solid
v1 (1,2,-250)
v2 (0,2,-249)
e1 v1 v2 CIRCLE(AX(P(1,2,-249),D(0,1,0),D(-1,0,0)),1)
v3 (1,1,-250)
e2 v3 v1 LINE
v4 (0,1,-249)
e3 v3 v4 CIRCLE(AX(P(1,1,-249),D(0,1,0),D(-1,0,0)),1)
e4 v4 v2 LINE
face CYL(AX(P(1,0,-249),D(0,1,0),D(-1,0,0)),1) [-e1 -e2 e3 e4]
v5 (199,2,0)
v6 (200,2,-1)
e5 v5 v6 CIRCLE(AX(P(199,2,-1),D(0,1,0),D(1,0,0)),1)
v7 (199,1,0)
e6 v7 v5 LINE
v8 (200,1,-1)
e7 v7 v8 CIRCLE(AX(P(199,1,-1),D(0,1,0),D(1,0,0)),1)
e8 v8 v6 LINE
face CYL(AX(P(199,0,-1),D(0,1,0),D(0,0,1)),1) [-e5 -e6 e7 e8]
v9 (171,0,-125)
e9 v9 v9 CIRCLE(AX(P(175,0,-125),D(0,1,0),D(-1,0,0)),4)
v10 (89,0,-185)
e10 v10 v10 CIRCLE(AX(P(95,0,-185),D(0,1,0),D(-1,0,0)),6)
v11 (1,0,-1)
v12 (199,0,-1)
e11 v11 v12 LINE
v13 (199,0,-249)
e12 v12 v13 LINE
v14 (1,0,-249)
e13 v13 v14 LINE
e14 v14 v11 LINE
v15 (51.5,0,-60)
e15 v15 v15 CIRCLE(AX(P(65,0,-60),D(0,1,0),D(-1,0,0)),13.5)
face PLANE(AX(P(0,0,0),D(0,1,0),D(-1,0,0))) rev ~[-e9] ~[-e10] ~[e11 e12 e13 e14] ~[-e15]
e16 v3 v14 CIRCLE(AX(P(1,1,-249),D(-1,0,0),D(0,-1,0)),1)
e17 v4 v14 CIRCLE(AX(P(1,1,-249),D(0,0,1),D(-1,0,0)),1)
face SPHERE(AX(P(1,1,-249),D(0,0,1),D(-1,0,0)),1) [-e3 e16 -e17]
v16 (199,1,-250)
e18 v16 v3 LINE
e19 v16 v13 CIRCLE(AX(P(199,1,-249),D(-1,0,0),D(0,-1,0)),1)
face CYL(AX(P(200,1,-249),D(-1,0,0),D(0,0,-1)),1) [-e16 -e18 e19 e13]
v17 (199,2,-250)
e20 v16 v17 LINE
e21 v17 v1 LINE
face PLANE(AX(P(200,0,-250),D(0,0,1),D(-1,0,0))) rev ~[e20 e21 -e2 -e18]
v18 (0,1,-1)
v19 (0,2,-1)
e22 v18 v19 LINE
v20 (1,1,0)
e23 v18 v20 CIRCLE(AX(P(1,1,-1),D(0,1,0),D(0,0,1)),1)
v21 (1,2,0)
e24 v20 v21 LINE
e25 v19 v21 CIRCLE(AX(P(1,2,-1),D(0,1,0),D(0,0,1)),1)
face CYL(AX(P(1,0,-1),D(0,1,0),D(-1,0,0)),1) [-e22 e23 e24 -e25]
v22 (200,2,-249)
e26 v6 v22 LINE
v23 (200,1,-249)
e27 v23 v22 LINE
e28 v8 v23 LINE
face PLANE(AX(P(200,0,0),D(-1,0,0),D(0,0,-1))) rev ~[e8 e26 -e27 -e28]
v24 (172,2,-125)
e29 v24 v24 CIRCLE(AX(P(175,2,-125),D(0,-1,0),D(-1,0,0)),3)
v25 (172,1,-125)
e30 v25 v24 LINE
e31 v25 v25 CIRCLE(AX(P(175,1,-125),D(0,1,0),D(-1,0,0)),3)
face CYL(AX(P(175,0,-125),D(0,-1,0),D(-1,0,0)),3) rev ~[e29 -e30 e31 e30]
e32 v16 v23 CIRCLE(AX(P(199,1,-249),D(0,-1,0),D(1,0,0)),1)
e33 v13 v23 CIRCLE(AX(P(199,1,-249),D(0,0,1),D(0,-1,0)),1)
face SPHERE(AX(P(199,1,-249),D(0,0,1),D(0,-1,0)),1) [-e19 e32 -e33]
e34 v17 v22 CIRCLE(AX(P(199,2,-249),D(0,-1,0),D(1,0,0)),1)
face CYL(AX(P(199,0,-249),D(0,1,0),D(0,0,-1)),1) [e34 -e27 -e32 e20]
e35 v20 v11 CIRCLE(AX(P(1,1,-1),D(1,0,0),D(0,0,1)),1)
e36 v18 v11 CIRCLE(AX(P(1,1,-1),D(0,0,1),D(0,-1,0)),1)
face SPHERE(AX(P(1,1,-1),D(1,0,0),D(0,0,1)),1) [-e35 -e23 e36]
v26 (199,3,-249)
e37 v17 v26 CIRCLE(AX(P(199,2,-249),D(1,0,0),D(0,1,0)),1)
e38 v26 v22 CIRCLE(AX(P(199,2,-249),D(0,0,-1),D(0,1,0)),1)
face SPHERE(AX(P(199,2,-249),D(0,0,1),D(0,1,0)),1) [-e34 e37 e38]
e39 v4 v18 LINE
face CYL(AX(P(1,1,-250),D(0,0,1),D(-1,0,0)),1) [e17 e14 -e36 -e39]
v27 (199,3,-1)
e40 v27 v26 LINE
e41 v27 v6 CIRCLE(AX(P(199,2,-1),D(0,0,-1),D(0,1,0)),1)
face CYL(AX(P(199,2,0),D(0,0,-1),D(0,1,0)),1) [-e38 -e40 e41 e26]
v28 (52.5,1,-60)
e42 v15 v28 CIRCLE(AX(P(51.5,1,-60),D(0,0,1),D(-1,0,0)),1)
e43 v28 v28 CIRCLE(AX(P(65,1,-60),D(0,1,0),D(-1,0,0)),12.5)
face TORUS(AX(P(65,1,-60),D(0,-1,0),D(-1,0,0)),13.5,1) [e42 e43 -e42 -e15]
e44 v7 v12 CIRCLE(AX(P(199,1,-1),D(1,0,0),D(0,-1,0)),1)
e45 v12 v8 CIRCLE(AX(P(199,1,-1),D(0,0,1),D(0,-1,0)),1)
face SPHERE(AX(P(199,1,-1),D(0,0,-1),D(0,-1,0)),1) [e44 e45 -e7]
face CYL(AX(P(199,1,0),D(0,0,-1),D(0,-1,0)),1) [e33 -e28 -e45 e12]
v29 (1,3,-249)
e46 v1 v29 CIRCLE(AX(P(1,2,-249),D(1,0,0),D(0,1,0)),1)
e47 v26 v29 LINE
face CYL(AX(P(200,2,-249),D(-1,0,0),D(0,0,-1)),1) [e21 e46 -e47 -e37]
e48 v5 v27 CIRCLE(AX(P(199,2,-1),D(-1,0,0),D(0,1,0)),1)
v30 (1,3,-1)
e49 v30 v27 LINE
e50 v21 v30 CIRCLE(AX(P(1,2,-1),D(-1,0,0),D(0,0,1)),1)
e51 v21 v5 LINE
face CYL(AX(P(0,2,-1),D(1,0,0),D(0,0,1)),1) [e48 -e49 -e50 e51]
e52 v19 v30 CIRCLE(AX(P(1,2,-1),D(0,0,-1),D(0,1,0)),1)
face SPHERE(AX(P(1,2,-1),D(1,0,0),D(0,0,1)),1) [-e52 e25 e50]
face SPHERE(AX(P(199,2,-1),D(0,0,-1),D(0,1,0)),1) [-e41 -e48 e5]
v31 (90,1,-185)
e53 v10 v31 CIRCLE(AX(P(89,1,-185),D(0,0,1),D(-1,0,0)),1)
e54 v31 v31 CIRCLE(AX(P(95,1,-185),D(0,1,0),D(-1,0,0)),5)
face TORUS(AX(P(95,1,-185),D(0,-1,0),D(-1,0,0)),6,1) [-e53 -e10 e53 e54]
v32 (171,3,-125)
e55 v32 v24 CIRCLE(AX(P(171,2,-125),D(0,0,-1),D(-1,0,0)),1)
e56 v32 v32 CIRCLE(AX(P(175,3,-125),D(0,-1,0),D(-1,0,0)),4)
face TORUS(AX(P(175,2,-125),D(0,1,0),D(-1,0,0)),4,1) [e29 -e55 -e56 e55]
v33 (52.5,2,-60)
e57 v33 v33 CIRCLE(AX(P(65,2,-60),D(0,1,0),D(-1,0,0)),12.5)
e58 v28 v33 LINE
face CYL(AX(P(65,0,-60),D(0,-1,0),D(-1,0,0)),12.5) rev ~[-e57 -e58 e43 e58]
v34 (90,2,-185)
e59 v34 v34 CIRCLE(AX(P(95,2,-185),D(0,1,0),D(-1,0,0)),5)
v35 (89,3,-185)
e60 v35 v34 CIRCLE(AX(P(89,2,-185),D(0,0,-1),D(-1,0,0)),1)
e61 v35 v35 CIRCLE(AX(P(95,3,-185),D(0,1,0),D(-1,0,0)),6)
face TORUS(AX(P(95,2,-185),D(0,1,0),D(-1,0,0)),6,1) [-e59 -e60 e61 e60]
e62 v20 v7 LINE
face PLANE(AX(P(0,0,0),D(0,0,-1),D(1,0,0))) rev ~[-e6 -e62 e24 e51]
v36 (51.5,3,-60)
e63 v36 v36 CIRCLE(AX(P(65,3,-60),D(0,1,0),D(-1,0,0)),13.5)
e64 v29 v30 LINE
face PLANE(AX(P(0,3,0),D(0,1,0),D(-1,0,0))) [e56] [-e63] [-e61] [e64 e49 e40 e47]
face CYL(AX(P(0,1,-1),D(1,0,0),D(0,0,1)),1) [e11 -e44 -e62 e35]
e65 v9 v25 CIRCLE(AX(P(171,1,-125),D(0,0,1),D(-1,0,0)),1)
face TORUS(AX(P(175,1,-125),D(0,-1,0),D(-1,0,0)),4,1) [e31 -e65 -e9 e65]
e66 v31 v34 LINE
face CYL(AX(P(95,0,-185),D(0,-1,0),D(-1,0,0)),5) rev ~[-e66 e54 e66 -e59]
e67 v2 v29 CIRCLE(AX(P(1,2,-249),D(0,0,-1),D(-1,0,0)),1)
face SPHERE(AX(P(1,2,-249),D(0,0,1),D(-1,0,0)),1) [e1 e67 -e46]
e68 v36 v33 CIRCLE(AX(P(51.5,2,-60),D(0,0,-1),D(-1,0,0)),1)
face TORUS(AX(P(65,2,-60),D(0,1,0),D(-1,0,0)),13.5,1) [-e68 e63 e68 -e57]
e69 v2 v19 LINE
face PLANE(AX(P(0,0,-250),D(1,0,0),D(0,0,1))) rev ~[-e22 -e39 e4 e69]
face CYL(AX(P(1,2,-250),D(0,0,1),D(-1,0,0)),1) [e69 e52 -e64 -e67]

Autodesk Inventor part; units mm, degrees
ref_plane "YZ Plane" through (0, 0, 0) normal (1, 0, 0) x (0, 1, 0)
ref_plane "XZ Plane" through (0, 0, 0) normal (0, 1, 0) x (-1, 0, 0)
ref_plane "XY Plane" through (0, 0, 0) normal (0, 0, 1) x (1, 0, 0)
sketch "page_lines" plane through (0, 0, 0) normal (0, 1, 0) x (-1, 0, 0)
  line L0 (0, 0) -> (-200, 0)
  line L1 (-200, 0) -> (-200, -250)
  line L2 (-200, -250) -> (0, -250)
  line L3 (0, -250) -> (0, 0)
  circle A0 centre (-65, -60) radius 6
  circle A1 centre (-125, -80) radius 6
  circle A2 centre (-65, -60) radius 12.5
  circle A3 centre (-65, -60) radius 8.5
  circle A4 centre (-125, -80) radius 8.5
  circle A5 centre (-125, -80) radius 12.5
  circle A6 centre (-175, -125) radius 3
  line L4 (-175, -125) -> (-175, -209)
  line L5 (-175, -125) -> (-91, -125) construction
  circle A7 centre (-175, -139) radius 3
  circle A8 centre (-175, -153) radius 3
  circle A9 centre (-175, -167) radius 3
  circle A10 centre (-175, -181) radius 3
  circle A11 centre (-175, -195) radius 3
  circle A12 centre (-175, -209) radius 3
  circle A13 centre (-95, -185) radius 2.5
  circle A14 centre (-95, -185) radius 5
  point P0 (-200, -125)
  dimension "d0" = 200
  dimension "d1" = 250
  dimension "d2" = 12
  dimension "d3" = 12
  dimension "d4" = 25
  dimension "d5" = 17
  dimension "d6" = 17
  dimension "d7" = 25
  dimension "d8" = 75
  dimension "d9" = 80
  dimension "d10" = 65
  dimension "d11" = 60
  dimension "d12" = 6
  dimension "d13" = 84
  dimension "d14" = 90
  dimension "d15" = 25
  dimension "d16" = 125
  dimension "d19" = 14
  dimension "d24" = 5
  dimension "d25" = 10
  dimension "d26" = 65
  dimension "d27" = 95
extrude "not" add sketch "page_lines" along normal blind 3 contours L3 L2 L1 L0 | A1 | A4 | A5 | A7 L4 | L4 A7 | A8 L4 | L4 A8 | A9 L4 | L4 A9 | A10 L4 | L4 A10 | A11 L4 | L4 A11 | A12
fillet "Fillet1" radius 1 18 edges at (77.5, 3, -60) (77.5, 0, -60) (100, 3, -185) (100, 0, -185) (178, 3, -125) (178, 0, -125) (200, 3, -125) (200, 0, -125) (100, 0, 0) (100, 3, 0) (200, 1.5, 0) (0, 1.5, 0) (0, 3, -125) (0, 0, -125) (0, 1.5, -250) (100, 3, -250) (100, 0, -250) (200, 1.5, -250)
properties part number "pages_not"
